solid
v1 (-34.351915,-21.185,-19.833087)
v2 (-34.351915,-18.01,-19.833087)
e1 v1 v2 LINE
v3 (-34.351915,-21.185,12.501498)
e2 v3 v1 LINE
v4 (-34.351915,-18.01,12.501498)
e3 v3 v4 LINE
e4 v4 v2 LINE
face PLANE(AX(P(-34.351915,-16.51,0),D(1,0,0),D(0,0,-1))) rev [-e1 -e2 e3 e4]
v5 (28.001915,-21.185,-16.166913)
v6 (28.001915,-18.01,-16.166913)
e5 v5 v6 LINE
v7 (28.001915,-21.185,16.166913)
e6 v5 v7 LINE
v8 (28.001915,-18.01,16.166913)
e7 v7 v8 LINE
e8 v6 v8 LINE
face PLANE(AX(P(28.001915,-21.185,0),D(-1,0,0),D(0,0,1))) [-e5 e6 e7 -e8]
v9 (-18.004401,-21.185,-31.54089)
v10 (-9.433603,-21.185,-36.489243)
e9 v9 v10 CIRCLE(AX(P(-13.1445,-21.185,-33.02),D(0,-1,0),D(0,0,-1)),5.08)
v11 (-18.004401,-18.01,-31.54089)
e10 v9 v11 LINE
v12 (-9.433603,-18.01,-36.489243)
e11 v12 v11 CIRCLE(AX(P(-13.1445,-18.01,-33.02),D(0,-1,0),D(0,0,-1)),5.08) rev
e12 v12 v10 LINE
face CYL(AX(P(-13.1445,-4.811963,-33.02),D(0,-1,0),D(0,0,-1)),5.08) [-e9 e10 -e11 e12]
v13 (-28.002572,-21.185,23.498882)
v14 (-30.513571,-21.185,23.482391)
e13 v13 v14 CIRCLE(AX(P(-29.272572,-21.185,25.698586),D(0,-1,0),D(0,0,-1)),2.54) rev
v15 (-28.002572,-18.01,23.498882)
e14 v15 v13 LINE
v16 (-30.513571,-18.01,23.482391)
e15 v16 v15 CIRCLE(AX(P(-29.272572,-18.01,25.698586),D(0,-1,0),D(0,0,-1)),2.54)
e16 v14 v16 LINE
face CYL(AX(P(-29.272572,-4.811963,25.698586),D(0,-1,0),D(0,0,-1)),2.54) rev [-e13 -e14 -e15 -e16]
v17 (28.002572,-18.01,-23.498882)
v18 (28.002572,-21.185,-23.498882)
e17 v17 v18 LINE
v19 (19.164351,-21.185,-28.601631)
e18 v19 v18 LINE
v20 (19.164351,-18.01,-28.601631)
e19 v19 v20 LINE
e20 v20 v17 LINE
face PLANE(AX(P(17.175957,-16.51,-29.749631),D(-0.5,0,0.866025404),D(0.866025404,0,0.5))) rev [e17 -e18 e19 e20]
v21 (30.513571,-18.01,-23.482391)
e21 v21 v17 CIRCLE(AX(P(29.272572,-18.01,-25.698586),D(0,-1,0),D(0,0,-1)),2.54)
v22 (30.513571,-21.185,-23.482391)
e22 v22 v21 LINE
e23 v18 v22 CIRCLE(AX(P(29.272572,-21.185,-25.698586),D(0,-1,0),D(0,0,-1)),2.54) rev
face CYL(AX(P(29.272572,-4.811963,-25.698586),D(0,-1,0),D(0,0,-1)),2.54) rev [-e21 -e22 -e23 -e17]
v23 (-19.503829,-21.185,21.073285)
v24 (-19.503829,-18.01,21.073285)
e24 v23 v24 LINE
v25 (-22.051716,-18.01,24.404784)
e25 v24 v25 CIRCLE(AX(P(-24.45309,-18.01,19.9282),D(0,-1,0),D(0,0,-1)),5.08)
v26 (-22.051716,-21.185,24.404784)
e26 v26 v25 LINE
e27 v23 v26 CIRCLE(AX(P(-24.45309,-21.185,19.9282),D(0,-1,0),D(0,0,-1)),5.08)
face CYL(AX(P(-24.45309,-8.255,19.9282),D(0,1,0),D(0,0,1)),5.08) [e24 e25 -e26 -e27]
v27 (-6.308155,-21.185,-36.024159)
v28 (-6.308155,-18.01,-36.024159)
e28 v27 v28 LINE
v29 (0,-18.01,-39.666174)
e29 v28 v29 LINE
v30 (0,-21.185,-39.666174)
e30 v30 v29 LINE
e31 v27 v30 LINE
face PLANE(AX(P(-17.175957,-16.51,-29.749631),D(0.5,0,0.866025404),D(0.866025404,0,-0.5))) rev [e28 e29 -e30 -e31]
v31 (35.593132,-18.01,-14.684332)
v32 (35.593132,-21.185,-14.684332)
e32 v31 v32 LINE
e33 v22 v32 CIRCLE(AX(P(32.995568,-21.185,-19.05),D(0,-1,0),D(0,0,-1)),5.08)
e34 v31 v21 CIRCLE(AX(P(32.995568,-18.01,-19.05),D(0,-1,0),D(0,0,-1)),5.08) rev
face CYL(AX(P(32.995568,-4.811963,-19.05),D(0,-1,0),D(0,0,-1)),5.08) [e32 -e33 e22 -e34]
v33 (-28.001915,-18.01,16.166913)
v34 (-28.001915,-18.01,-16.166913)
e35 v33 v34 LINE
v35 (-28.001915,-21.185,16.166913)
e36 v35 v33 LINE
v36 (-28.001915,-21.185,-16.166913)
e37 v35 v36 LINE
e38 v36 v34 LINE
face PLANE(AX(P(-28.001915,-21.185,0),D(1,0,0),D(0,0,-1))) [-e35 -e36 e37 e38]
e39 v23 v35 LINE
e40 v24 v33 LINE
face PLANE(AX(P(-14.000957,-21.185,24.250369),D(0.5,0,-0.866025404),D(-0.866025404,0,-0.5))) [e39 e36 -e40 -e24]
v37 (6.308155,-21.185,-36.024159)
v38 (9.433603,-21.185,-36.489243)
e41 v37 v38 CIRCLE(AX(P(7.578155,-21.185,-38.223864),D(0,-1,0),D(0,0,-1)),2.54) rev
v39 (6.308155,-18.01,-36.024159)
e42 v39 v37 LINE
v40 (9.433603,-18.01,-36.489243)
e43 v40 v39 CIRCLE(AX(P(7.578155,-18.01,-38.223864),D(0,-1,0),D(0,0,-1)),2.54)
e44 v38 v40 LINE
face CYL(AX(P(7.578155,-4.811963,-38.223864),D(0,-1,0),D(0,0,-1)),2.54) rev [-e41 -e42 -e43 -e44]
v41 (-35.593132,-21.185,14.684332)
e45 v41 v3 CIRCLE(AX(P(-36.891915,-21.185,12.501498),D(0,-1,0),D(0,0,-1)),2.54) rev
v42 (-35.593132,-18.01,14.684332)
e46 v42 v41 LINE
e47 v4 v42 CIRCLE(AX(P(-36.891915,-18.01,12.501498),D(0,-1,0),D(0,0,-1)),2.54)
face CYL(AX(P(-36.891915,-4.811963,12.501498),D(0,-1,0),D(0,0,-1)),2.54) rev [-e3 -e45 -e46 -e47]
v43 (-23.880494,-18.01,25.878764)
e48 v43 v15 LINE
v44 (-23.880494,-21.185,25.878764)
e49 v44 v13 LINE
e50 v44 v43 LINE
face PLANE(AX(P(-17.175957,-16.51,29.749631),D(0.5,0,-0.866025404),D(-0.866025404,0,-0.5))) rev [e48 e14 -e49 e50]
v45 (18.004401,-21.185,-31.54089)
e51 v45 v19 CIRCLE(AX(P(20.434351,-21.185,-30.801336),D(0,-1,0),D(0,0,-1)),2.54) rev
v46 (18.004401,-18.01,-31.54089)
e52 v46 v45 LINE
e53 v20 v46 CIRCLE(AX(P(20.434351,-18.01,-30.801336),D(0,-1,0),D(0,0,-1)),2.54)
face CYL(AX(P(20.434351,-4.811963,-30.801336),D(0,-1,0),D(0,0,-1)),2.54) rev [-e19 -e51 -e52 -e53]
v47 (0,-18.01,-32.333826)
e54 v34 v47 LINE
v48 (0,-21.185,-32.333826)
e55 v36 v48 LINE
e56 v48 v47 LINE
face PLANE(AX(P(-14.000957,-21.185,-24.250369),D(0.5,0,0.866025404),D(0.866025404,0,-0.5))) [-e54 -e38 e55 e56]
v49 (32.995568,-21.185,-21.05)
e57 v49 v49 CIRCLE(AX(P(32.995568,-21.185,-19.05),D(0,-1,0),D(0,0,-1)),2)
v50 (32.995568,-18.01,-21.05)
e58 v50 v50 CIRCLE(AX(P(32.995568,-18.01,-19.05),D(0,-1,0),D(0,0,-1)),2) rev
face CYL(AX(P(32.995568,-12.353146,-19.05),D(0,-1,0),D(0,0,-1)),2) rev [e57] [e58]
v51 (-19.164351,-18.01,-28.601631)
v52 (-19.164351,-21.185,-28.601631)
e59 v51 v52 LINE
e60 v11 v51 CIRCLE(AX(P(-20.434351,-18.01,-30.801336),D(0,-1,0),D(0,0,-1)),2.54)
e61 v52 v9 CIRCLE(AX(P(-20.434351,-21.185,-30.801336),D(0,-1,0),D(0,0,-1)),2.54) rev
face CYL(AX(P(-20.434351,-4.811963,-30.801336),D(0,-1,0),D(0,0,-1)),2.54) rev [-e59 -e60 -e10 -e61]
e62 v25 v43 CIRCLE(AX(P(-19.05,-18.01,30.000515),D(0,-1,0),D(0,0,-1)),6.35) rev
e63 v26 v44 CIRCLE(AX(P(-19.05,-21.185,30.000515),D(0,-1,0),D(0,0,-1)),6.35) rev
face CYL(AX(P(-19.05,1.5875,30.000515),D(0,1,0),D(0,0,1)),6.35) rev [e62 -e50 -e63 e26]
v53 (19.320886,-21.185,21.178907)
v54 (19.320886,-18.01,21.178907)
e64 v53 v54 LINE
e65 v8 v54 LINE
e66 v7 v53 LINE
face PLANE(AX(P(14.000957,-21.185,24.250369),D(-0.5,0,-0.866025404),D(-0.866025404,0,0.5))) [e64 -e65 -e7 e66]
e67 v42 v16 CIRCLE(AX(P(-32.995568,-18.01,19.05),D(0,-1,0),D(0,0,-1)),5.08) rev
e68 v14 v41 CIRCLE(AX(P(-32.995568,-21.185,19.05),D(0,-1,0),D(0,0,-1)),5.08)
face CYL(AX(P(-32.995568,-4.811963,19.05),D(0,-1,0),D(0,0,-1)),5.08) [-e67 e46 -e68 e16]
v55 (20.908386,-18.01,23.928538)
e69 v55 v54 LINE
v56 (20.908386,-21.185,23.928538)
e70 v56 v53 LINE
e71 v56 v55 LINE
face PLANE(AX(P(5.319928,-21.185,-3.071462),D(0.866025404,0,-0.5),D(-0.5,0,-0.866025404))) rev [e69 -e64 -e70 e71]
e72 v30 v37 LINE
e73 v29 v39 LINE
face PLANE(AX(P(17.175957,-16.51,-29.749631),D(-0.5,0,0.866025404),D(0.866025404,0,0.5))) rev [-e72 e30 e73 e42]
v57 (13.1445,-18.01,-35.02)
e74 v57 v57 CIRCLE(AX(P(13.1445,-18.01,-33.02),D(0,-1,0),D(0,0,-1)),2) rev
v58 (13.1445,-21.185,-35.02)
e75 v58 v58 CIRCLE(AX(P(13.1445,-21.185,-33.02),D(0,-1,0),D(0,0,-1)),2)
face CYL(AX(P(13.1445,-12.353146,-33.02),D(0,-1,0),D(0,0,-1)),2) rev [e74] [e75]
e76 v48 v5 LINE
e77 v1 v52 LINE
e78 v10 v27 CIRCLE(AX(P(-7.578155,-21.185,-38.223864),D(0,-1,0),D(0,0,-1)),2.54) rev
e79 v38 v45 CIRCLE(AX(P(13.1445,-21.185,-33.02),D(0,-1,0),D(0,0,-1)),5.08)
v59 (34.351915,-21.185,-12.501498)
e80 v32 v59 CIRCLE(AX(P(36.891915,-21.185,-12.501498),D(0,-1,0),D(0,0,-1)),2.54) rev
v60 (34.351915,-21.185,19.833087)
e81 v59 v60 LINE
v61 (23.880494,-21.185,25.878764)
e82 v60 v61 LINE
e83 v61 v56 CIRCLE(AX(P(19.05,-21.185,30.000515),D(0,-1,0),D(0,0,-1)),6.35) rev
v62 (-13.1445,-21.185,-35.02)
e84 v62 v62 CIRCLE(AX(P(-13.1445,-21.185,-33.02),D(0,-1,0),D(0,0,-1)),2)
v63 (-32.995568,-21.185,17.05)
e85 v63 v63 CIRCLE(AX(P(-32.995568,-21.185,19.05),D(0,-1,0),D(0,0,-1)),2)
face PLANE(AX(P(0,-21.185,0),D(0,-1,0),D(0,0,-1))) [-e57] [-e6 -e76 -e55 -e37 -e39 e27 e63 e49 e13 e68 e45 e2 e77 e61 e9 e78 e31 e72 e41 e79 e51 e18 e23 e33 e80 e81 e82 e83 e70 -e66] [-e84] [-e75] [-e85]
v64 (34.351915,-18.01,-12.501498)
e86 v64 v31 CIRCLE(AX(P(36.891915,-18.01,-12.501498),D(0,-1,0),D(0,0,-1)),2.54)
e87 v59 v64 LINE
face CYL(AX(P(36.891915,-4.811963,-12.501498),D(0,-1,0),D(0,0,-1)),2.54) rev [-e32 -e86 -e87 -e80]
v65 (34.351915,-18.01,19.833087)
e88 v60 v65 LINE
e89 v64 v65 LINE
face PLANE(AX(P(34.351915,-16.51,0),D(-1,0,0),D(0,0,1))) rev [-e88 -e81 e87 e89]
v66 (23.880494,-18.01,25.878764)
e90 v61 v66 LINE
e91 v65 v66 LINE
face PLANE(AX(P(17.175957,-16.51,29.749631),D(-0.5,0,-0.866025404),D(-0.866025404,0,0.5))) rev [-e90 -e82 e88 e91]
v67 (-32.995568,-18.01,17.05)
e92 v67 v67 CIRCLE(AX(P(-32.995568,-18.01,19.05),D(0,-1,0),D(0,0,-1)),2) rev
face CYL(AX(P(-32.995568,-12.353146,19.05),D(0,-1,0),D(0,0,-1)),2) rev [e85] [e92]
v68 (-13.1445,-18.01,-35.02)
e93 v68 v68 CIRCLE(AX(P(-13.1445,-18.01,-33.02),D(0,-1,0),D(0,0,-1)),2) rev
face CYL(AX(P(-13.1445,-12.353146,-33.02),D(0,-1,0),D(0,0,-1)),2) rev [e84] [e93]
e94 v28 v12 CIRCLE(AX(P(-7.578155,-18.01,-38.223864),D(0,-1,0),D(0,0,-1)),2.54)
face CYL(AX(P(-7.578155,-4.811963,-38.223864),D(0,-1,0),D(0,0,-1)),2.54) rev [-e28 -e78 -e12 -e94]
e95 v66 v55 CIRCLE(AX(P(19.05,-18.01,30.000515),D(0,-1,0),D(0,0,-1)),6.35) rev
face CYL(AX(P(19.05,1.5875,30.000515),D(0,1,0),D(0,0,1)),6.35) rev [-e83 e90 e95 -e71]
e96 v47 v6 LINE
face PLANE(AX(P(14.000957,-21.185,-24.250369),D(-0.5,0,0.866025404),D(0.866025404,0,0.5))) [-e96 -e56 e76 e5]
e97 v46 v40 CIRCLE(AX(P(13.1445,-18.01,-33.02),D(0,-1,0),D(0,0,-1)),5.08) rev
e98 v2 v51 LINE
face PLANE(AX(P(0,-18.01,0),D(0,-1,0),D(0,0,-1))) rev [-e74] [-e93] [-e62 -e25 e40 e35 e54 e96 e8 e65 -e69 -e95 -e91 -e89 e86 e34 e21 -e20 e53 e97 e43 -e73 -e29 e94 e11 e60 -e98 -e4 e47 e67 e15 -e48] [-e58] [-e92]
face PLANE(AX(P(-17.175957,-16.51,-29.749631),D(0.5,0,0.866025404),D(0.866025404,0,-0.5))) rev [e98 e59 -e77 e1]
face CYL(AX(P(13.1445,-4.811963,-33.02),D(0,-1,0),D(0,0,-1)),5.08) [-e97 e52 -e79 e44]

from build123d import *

# Parameters (mm, degrees)
SKETCH1_R            = 50.8
SKETCH1_R_2          = 48.8
SKETCH1_R_3          = 1.905
BOSS_EXTRUDE1_DEPTH  = 3.175
SKETCH3_R            = 50.8
SKETCH3_R_2          = 48.8
BOSS_EXTRUDE3_DEPTH  = 17.78
CUT_EXTRUDE1_DEPTH   = 75.009515604
FILLET2_R            = 6.35
SKETCH5_R            = 1.905
SKETCH5_W            = 16.479
SKETCH5_H            = 6
BOSS_EXTRUDE4_DEPTH  = 1
CUT_EXTRUDE2_DEPTH   = 75.835767181
BOSS_EXTRUDE5_DEPTH  = 17.78
SKETCH10_R           = 1.5
CUT_EXTRUDE4_DEPTH   = 75.009515742
BOSS_EXTRUDE7_START  = 17.78
SKETCH11_R           = 4.04
SKETCH11_R_2         = 1.5
BOSS_EXTRUDE7_DEPTH  = 17.78
BOSS_EXTRUDE8_START  = 31.75
BOSS_EXTRUDE8_DEPTH  = 31.75
FILLET4_R            = 3.175
BOSS_EXTRUDE9_DEPTH  = 15.24
CUT_EXTRUDE5_REACH   = 128.859
CIRPATTERN1_COUNT    = 4
BOSS_EXTRUDE12_DEPTH = 16.51
FILLET8_START        = -18
FILLET8_DEPTH        = 18
FILLET8_START_2      = -16.51
FILLET8_2_DEPTH      = 16.51
BOSS_EXTRUDE13_DEPTH = 1.5
FILLET9_R            = 5.08
BOSS_EXTRUDE14_START = -18.01
BOSS_EXTRUDE14_DEPTH = 18.01
SKETCH21_R           = 1.5
SKETCH21_R_2         = 1.905
BOSS_EXTRUDE15_DEPTH = 3.175
SKETCH22_R           = 73.302422264
CUT_EXTRUDE6_DEPTH   = 38.965
SKETCH24_R           = 2
CUT_EXTRUDE7_DEPTH   = 3.175
BOSS_EXTRUDE16_DEPTH = 3.175
FILLET10_R           = 2.54


with BuildPart() as part:
    # Sketch1 → Boss-Extrude1 (new body)
    # profile 1 of 2: a face of its own
    with BuildSketch(Plane(origin=(0, 0, 0), x_dir=(1, 0, 0), z_dir=(0, 1, 0))):
        with Locations(Location((0, 0, 0), (0, 0, 270))):
            Circle(SKETCH1_R)
        Circle(SKETCH1_R_2, mode=Mode.SUBTRACT)
    # profile 2 of 2: a face of its own
    with BuildSketch(Plane(origin=(0, 0, 0), x_dir=(1, 0, 0), z_dir=(0, 1, 0))):
        Circle(SKETCH1_R_2)
        with Locations(Location((-13.1445, 33.02, 0), (0, 0, 270))):
            Circle(SKETCH1_R_3, mode=Mode.SUBTRACT)
        with Locations(Location((13.1445, 33.02, 0), (0, 0, 270))):
            Circle(SKETCH1_R_3, mode=Mode.SUBTRACT)
    extrude(amount=BOSS_EXTRUDE1_DEPTH)

    # Sketch3 → Boss-Extrude3 (add)
    with BuildSketch(Plane(origin=(0, 3.175, 0), x_dir=(1, 0, 0), z_dir=(0, 1, 0))):
        with Locations(Location((0, 0, 0), (0, 0, 270))):
            Circle(SKETCH3_R)
        with Locations(Location((0, 0, 0), (0, 0, 270))):
            Circle(SKETCH3_R_2, mode=Mode.SUBTRACT)
    extrude(amount=BOSS_EXTRUDE3_DEPTH)

    # Sketch4 → Cut-Extrude1 (cut, through all)
    with BuildSketch(Plane(origin=(0, 3.175, 0), x_dir=(1, 0, 0), z_dir=(0, 1, 0))):
        with BuildLine():
            Line((25.4, -38.01523905), (25.4, -20.834346642))
            add(Edge.make_bspline(
                [(-25.4, -20.834346642), (0, -32.254229315), (25.4, -20.834346642)],
                knots=[0, 0, 0, 1, 1, 1], degree=2))
            Line((-25.4, -20.834346642), (-25.4, -38.01523905))
            ThreePointArc((-25.4, -38.01523905), (0, -45.72), (25.4, -38.01523905))
        make_face()
    extrude(amount=-CUT_EXTRUDE1_DEPTH, mode=Mode.SUBTRACT)

    # Fillet2
    fillet2_edges = [part.edges().sort_by_distance(p)[0] for p in [
        (25.4, 1.5875, 20.834346642),
        (-25.4, 1.5875, 20.834346642),
        (-25.4, 1.5875, 38.01523905),
        (25.4, 1.5875, 38.01523905),
    ]]
    fillet(fillet2_edges, radius=FILLET2_R)

    # Sketch5 → Boss-Extrude4 (add)
    # profile 1 of 8: a face of its own
    with BuildSketch(Plane(origin=(0, 3.175, 0), x_dir=(1, 0, 0), z_dir=(0, 1, 0))):
        with BuildLine():
            Line((13.1445, 37.925), (-13.1445, 37.925))
            ThreePointArc((-13.1445, 37.925), (-9.676141238, 36.488358762), (-8.2395, 33.02))
            Line((-8.2395, 33.02), (-8.2395, 28.115))
            Line((-8.2395, 28.115), (8.2395, 28.115))
            Line((8.2395, 28.115), (8.2395, 33.02))
            ThreePointArc((8.2395, 33.02), (9.676141238, 36.488358762), (13.1445, 37.925))
        make_face()
    # profile 2 of 8: a face of its own
    with BuildSketch(Plane(origin=(0, 3.175, 0), x_dir=(1, 0, 0), z_dir=(0, 1, 0))):
        with BuildLine():
            ThreePointArc((-8.2395, 33.02), (-9.676141238, 36.488358762), (-13.1445, 37.925))
            ThreePointArc((-13.1445, 37.925), (-16.612858762, 36.488358762), (-18.0495, 33.02))
            ThreePointArc((-18.0495, 33.02), (-16.612858762, 29.551641238), (-13.1445, 28.115))
            ThreePointArc((-13.1445, 28.115), (-9.676141238, 29.551641238), (-8.2395, 33.02))
        make_face()
        with Locations(Location((-13.1445, 33.02, 0), (0, 0, 270))):
            Circle(SKETCH5_R, mode=Mode.SUBTRACT)
    # profile 3 of 8: a face of its own
    with BuildSketch(Plane(origin=(0, 3.175, 0), x_dir=(1, 0, 0), z_dir=(0, 1, 0))):
        with BuildLine():
            ThreePointArc((18.0495, 33.02), (16.612858762, 36.488358762), (13.1445, 37.925))
            ThreePointArc((13.1445, 37.925), (9.676141238, 36.488358762), (8.2395, 33.02))
            ThreePointArc((8.2395, 33.02), (9.676141238, 29.551641238), (13.1445, 28.115))
            ThreePointArc((13.1445, 28.115), (16.612858762, 29.551641238), (18.0495, 33.02))
        make_face()
        with Locations(Location((13.1445, 33.02, 0), (0, 0, 270))):
            Circle(SKETCH5_R, mode=Mode.SUBTRACT)
    # profile 4 of 8: a face of its own
    with BuildSketch(Plane(origin=(0, 3.175, 0), x_dir=(1, 0, 0), z_dir=(0, 1, 0))):
        with BuildLine():
            Line((-8.2395, 28.115), (-8.2395, 33.02))
            ThreePointArc((-8.2395, 33.02), (-9.676141238, 29.551641238), (-13.1445, 28.115))
            Line((-13.1445, 28.115), (-8.2395, 28.115))
        make_face()
    # profile 5 of 8: a face of its own
    with BuildSketch(Plane(origin=(0, 3.175, 0), x_dir=(1, 0, 0), z_dir=(0, 1, 0))):
        with BuildLine():
            ThreePointArc((-13.1445, 28.115), (-16.612858762, 29.551641238), (-18.0495, 33.02))
            Line((-18.0495, 33.02), (-18.0495, -23.729829016))
            add(Edge.make_bspline(
                [(-17.200482213, -23.925830908), (-17.339134534, -23.883616376), (-17.479112922, -23.845147844), (-17.620279441, -23.81048615), (-17.762494237, -23.779683986), (-17.905615595, -23.752786017), (-18.049499996, -23.729828993)],
                knots=[0, 0, 0, 0, 0, 0, 0, 0.074218898, 0.074218898, 0.074218898, 0.074218898, 0.074218898, 0.074218898, 0.074218898], degree=6))
            add(Edge.make_bspline(
                [(-17.200482213, -23.925830908), (-12.719991107, -25.289975642), (-8.2395, -25.943438167)],
                knots=[0.16140783, 0.16140783, 0.16140783, 0.337805118, 0.337805118, 0.337805118], degree=2))
            Line((-8.2395, -25.943438167), (-8.2395, -2.461719083))
            Line((-8.2395, -2.461719083), (-8.2395, 3.538280917))
            Line((-8.2395, 3.538280917), (-8.2395, 28.115))
            Line((-8.2395, 28.115), (-13.1445, 28.115))
        make_face()
    # profile 6 of 8: a face of its own
    with BuildSketch(Plane(origin=(0, 3.175, 0), x_dir=(1, 0, 0), z_dir=(0, 1, 0))):
        with BuildLine():
            Line((18.0495, -23.729829016), (18.0495, 33.02))
            ThreePointArc((18.0495, 33.02), (16.612858762, 29.551641238), (13.1445, 28.115))
            Line((13.1445, 28.115), (8.2395, 28.115))
            Line((8.2395, 28.115), (8.2395, 3.538280917))
            Line((8.2395, 3.538280917), (8.2395, -2.461719083))
            Line((8.2395, -2.461719083), (8.2395, -25.943438167))
            add(Edge.make_bspline(
                [(8.2395, -25.943438167), (12.719991107, -25.289975642), (17.200482213, -23.925830908)],
                knots=[0.662194882, 0.662194882, 0.662194882, 0.83859217, 0.83859217, 0.83859217], degree=2))
            add(Edge.make_bspline(
                [(18.049499996, -23.729828993), (17.905615595, -23.752786017), (17.762494237, -23.779683986), (17.620279441, -23.81048615), (17.479112922, -23.845147844), (17.339134534, -23.883616376), (17.200482213, -23.925830908)],
                knots=[0.925781102, 0.925781102, 0.925781102, 0.925781102, 0.925781102, 0.925781102, 0.925781102, 1, 1, 1, 1, 1, 1, 1], degree=6))
        make_face()
    # profile 7 of 8: a face of its own
    with BuildSketch(Plane(origin=(0, 3.175, 0), x_dir=(1, 0, 0), z_dir=(0, 1, 0))):
        with BuildLine():
            ThreePointArc((13.1445, 28.115), (9.676141238, 29.551641238), (8.2395, 33.02))
            Line((8.2395, 33.02), (8.2395, 28.115))
            Line((8.2395, 28.115), (13.1445, 28.115))
        make_face()
    # profile 8 of 8: a face of its own
    with BuildSketch(Plane(origin=(0, 3.175, 0), x_dir=(1, 0, 0), z_dir=(0, 1, 0))):
        with Locations((0, 0.538280917)):
            Rectangle(SKETCH5_W, SKETCH5_H)
    extrude(amount=BOSS_EXTRUDE4_DEPTH)

    # Sketch6 → Cut-Extrude2 (cut, through all)
    with BuildSketch(Plane(origin=(0, 20.955, 0), x_dir=(1, 0, 0), z_dir=(0, 1, 0))):
        with BuildLine():
            Line((42.262039705, 24.4), (39.594681461, 22.86))
            ThreePointArc((39.594681461, 22.86), (44.162128778, 11.833206742), (45.72, 0))
            Line((45.72, 0), (48.8, 0))
            ThreePointArc((48.8, 0), (47.137180323, 12.630369401), (42.262039705, 24.4))
        make_face()
        with BuildLine():
            ThreePointArc((45.72, 0), (44.162128778, -11.833206742), (39.594681461, -22.86))
            Line((39.594681461, -22.86), (42.262039705, -24.4))
            ThreePointArc((42.262039705, -24.4), (47.137180323, -12.630369401), (48.8, 0))
            Line((48.8, 0), (45.72, 0))
        make_face()
        with BuildLine():
            ThreePointArc((48.8, 0), (47.137180323, -12.630369401), (42.262039705, -24.4))
            Line((42.262039705, -24.4), (43.994090512, -25.4))
            ThreePointArc((43.994090512, -25.4), (49.069031975, -13.148007491), (50.8, 0))
            Line((50.8, 0), (48.8, 0))
        make_face()
        with BuildLine():
            Line((43.994090512, 25.4), (42.262039705, 24.4))
            ThreePointArc((42.262039705, 24.4), (47.137180323, 12.630369401), (48.8, 0))
            Line((48.8, 0), (50.8, 0))
            ThreePointArc((50.8, 0), (49.069031975, 13.148007491), (43.994090512, 25.4))
        make_face()
    extrude(amount=-CUT_EXTRUDE2_DEPTH, mode=Mode.SUBTRACT)

    # Sketch7 → Boss-Extrude5 (add)
    with BuildSketch(Plane(origin=(0, 3.175, 0), x_dir=(1, 0, 0), z_dir=(0, 1, 0))):
        with BuildLine():
            Line((42.262039705, -24.4), (39.594681461, -22.86))
            ThreePointArc((39.594681461, -22.86), (45.72, 0), (39.594681461, 22.86))
            Line((39.594681461, 22.86), (42.262039705, 24.4))
            ThreePointArc((42.262039705, 24.4), (41.753056776, 25.261081723), (41.226531944, 26.111550392))
            Line((41.226531944, 26.111550392), (36.822993007, 23.569166002))
            ThreePointArc((36.822993007, 23.569166002), (43.72, 0), (36.822993007, -23.569166002))
            Line((36.822993007, -23.569166002), (41.226531944, -26.111550392))
            ThreePointArc((41.226531944, -26.111550392), (41.753056776, -25.261081723), (42.262039705, -24.4))
        make_face()
    extrude(amount=BOSS_EXTRUDE5_DEPTH)

    # Sketch10 → Cut-Extrude4 (cut, through all)
    with BuildSketch(Plane(origin=(0, 3.175, 0), x_dir=(1, 0, 0), z_dir=(0, 1, 0))):
        with Locations(Location((-32.995567884, -19.05, 0), (0, 0, 270))):
            Circle(SKETCH10_R)
        with Locations(Location((32.995567884, 19.05, 0), (0, 0, 270))):
            Circle(SKETCH10_R)
    extrude(amount=-CUT_EXTRUDE4_DEPTH, mode=Mode.SUBTRACT)

    # Sketch11 → Boss-Extrude7 (add)
    # profile 1 of 3: a face of its own
    with BuildSketch(Plane(origin=(0, 3.175, 0), x_dir=(1, 0, 0), z_dir=(0, 1, 0)).offset(BOSS_EXTRUDE7_START)):
        with BuildLine():
            Line((37.125332322, 23.09), (32.995567884, 23.09))
            ThreePointArc((32.995567884, 23.09), (35.85227928, 21.906711396), (37.035567884, 19.05))
            ThreePointArc((37.035567884, 19.05), (35.85227928, 16.193288604), (32.995567884, 15.01))
            Line((32.995567884, 15.01), (41.062614383, 15.01))
            ThreePointArc((41.062614383, 15.01), (39.302167275, 19.151450272), (37.125332322, 23.09))
        make_face()
    # profile 2 of 3: a face of its own
    with BuildSketch(Plane(origin=(0, 3.175, 0), x_dir=(1, 0, 0), z_dir=(0, 1, 0)).offset(BOSS_EXTRUDE7_START)):
        with Locations((32.995567884, 19.05)):
            Circle(SKETCH11_R)
        with Locations(Location((32.995567884, 19.05, 0), (0, 0, 270))):
            Circle(SKETCH11_R_2, mode=Mode.SUBTRACT)
    # profile 3 of 3: a face of its own
    with BuildSketch(Plane(origin=(0, 3.175, 0), x_dir=(1, 0, 0), z_dir=(0, 1, 0)).offset(BOSS_EXTRUDE7_START)):
        with Locations(Location((-32.995567884, -19.05, 0), (0, 0, 270))):
            Circle(SKETCH11_R)
        with Locations(Location((-32.995567884, -19.05, 0), (0, 0, 270))):
            Circle(SKETCH11_R_2, mode=Mode.SUBTRACT)
    extrude(amount=-BOSS_EXTRUDE7_DEPTH)

    # Sketch12 → Boss-Extrude8 (add)
    with BuildSketch(Plane.XZ.offset(BOSS_EXTRUDE8_START)):
        with BuildLine():
            ThreePointArc((28.584071469, 41.995128982), (29.185832393, 29.185832393), (41.995128982, 28.584071469))
            ThreePointArc((41.995128982, 28.584071469), (35.921024484, 35.921024484), (28.584071469, 41.995128982))
        make_face()
        with BuildLine():
            ThreePointArc((28.584071469, -41.995128982), (35.921024484, -35.921024484), (41.995128982, -28.584071469))
            ThreePointArc((41.995128982, -28.584071469), (29.185832393, -29.185832393), (28.584071469, -41.995128982))
        make_face()
        with BuildLine():
            ThreePointArc((-41.995128982, 28.584071469), (-29.185832393, 29.185832393), (-28.584071469, 41.995128982))
            ThreePointArc((-28.584071469, 41.995128982), (-35.921024484, 35.921024484), (-41.995128982, 28.584071469))
        make_face()
        with BuildLine():
            ThreePointArc((-41.995128982, -28.584071469), (-35.921024484, -35.921024484), (-28.584071469, -41.995128982))
            ThreePointArc((-28.584071469, -41.995128982), (-29.185832393, -29.185832393), (-41.995128982, -28.584071469))
        make_face()
    extrude(amount=-BOSS_EXTRUDE8_DEPTH)

    # Fillet4
    fillet4_edges = [part.edges().sort_by_distance(p)[0] for p in [
        (41.995128982, -15.875, 28.584071469),
        (28.584071469, -15.875, 41.995128982),
        (28.584071469, -15.875, -41.995128982),
        (41.995128982, -15.875, -28.584071469),
        (-28.584071469, -15.875, 41.995128982),
        (-41.995128982, -15.875, 28.584071469),
        (-41.995128982, -15.875, -28.584071469),
        (-28.584071469, -15.875, -41.995128982),
    ]]
    fillet(fillet4_edges, radius=FILLET4_R)

    # Sketch13 → Boss-Extrude9 (add)
    with BuildSketch(Plane.XZ.offset(31.75)):
        Polygon((35.022998872, 35.022998872), (30.532870812, 39.513126933), (26.940768363, 35.921024484), (35.921024484, 26.940768363), (39.513126933, 30.532870812), align=None)
        Polygon((26.940763662, -35.921029185), (35.921019783, -26.940773064), (39.513122232, -30.532875513), (35.022994171, -35.023003573), (30.532866111, -39.513131634), align=None)
        Polygon((-35.921033886, -26.940768363), (-26.940777765, -35.921024484), (-30.532880214, -39.513126933), (-35.023008274, -35.022998872), (-39.513136335, -30.532870812), align=None)
        Polygon((-26.940773064, 35.921029185), (-35.921029185, 26.940773064), (-39.513131634, 30.532875513), (-35.023003573, 35.023003573), (-30.532875513, 39.513131634), align=None)
    extrude(amount=BOSS_EXTRUDE9_DEPTH)

    # Sketch15 → Cut-Extrude5 (cut, up to next)
    with BuildSketch(Plane(origin=(-35.023003573, 0, 35.023003573), x_dir=(0.7071067811865472, 0, 0.7071067811865479), z_dir=(-0.7071067811865479, 0, 0.7071067811865472)), mode=Mode.PRIVATE) as cut_extrude5_sk1:
        with BuildLine():
            ThreePointArc((-1.280368799, -37.833557441), (-1.536442559, -40.650368799), (1.280368799, -40.906442559))
            Line((1.280368799, -40.906442559), (-1.280368799, -37.833557441))
        make_face()
    cut_extrude5_tool1 = extrude(cut_extrude5_sk1.sketch, amount=-CUT_EXTRUDE5_REACH, mode=Mode.PRIVATE) & part.part
    # Sketch15 → Cut-Extrude5 (cut, up to next)
    with BuildSketch(Plane(origin=(-35.023003573, 0, 35.023003573), x_dir=(0.7071067811865472, 0, 0.7071067811865479), z_dir=(-0.7071067811865479, 0, 0.7071067811865472)), mode=Mode.PRIVATE) as cut_extrude5_sk2:
        with BuildLine():
            Line((-1.280368799, -37.833557441), (1.280368799, -40.906442559))
            ThreePointArc((1.280368799, -40.906442559), (1.811178842, -40.218310792), (2, -39.37))
            ThreePointArc((2, -39.37), (0.848310792, -37.558821158), (-1.280368799, -37.833557441))
        make_face()
    cut_extrude5_tool2 = extrude(cut_extrude5_sk2.sketch, amount=-CUT_EXTRUDE5_REACH, mode=Mode.PRIVATE) & part.part
    # Sketch15 → Cut-Extrude5 (cut, up to next)
    with BuildSketch(Plane(origin=(-35.023003573, 0, 35.023003573), x_dir=(0.7071067811865472, 0, 0.7071067811865479), z_dir=(-0.7071067811865479, 0, 0.7071067811865472)), mode=Mode.PRIVATE) as cut_extrude5_sk3:
        with BuildLine():
            ThreePointArc((-1.280368799, -37.833557441), (-1.536442559, -40.650368799), (1.280368799, -40.906442559))
            Line((1.280368799, -40.906442559), (-1.280368799, -37.833557441))
        make_face()
    cut_extrude5_tool3 = extrude(cut_extrude5_sk3.sketch, amount=-CUT_EXTRUDE5_REACH, mode=Mode.PRIVATE) & part.part
    # Sketch15 → Cut-Extrude5 (cut, up to next)
    with BuildSketch(Plane(origin=(-35.023003573, 0, 35.023003573), x_dir=(0.7071067811865472, 0, 0.7071067811865479), z_dir=(-0.7071067811865479, 0, 0.7071067811865472)), mode=Mode.PRIVATE) as cut_extrude5_sk4:
        with BuildLine():
            Line((-1.280368799, -37.833557441), (1.280368799, -40.906442559))
            ThreePointArc((1.280368799, -40.906442559), (1.811178842, -40.218310792), (2, -39.37))
            ThreePointArc((2, -39.37), (0.848310792, -37.558821158), (-1.280368799, -37.833557441))
        make_face()
    cut_extrude5_tool4 = extrude(cut_extrude5_sk4.sketch, amount=-CUT_EXTRUDE5_REACH, mode=Mode.PRIVATE) & part.part
    cut_extrude5_1 = cut_extrude5_tool1.solids().sort_by_distance((-35.484098, -39.913405, 34.561909))[0]
    add(cut_extrude5_1, mode=Mode.SUBTRACT)
    cut_extrude5_2 = cut_extrude5_tool2.solids().sort_by_distance((-34.561909, -38.826595, 35.484098))[0]
    add(cut_extrude5_2, mode=Mode.SUBTRACT)
    cut_extrude5_3 = cut_extrude5_tool3.solids().sort_by_distance((-35.484098, -39.913405, 34.561909))[0]
    add(cut_extrude5_3, mode=Mode.SUBTRACT)
    cut_extrude5_4 = cut_extrude5_tool4.solids().sort_by_distance((-34.561909, -38.826595, 35.484098))[0]
    add(cut_extrude5_4, mode=Mode.SUBTRACT)
    cut_extrude5 = cut_extrude5_1 + cut_extrude5_2 + cut_extrude5_3 + cut_extrude5_4  # Cut-Extrude5 as one shape, for the pattern or mirror that repeats it

    # CirPattern1: Cut-Extrude5; each copy of Cut-Extrude5 runs up to whatever stops it at its own place
    cirpattern1_before = part.part  # the part as the pattern finds it: every copy runs up to it
    cirpattern1_cut_extrude5_long1 = extrude(cut_extrude5_sk1.sketch, amount=-CUT_EXTRUDE5_REACH, mode=Mode.PRIVATE)
    cirpattern1_cut_extrude5_long2 = extrude(cut_extrude5_sk2.sketch, amount=-CUT_EXTRUDE5_REACH, mode=Mode.PRIVATE)
    cirpattern1_cut_extrude5_long3 = extrude(cut_extrude5_sk3.sketch, amount=-CUT_EXTRUDE5_REACH, mode=Mode.PRIVATE)
    cirpattern1_cut_extrude5_long4 = extrude(cut_extrude5_sk4.sketch, amount=-CUT_EXTRUDE5_REACH, mode=Mode.PRIVATE)
    cirpattern1_cut_extrude5_tool1_1 = cirpattern1_cut_extrude5_long1.rotate(Axis((0, 3.175, 0), (0, -1, 0)), 1 * 360 / CIRPATTERN1_COUNT) & cirpattern1_before
    add(cirpattern1_cut_extrude5_tool1_1.solids().sort_by_distance((-34.561909, -39.913405, -35.484098))[0], mode=Mode.SUBTRACT)
    cirpattern1_cut_extrude5_tool2_1 = cirpattern1_cut_extrude5_long2.rotate(Axis((0, 3.175, 0), (0, -1, 0)), 1 * 360 / CIRPATTERN1_COUNT) & cirpattern1_before
    add(cirpattern1_cut_extrude5_tool2_1.solids().sort_by_distance((-35.484098, -38.826595, -34.561909))[0], mode=Mode.SUBTRACT)
    cirpattern1_cut_extrude5_tool3_1 = cirpattern1_cut_extrude5_long3.rotate(Axis((0, 3.175, 0), (0, -1, 0)), 1 * 360 / CIRPATTERN1_COUNT) & cirpattern1_before
    add(cirpattern1_cut_extrude5_tool3_1.solids().sort_by_distance((-34.561909, -39.913405, -35.484098))[0], mode=Mode.SUBTRACT)
    cirpattern1_cut_extrude5_tool4_1 = cirpattern1_cut_extrude5_long4.rotate(Axis((0, 3.175, 0), (0, -1, 0)), 1 * 360 / CIRPATTERN1_COUNT) & cirpattern1_before
    add(cirpattern1_cut_extrude5_tool4_1.solids().sort_by_distance((-35.484098, -38.826595, -34.561909))[0], mode=Mode.SUBTRACT)
    cirpattern1_cut_extrude5_tool1_2 = cirpattern1_cut_extrude5_long1.rotate(Axis((0, 3.175, 0), (0, -1, 0)), 2 * 360 / CIRPATTERN1_COUNT) & cirpattern1_before
    add(cirpattern1_cut_extrude5_tool1_2.solids().sort_by_distance((35.484098, -39.913405, -34.561909))[0], mode=Mode.SUBTRACT)
    cirpattern1_cut_extrude5_tool2_2 = cirpattern1_cut_extrude5_long2.rotate(Axis((0, 3.175, 0), (0, -1, 0)), 2 * 360 / CIRPATTERN1_COUNT) & cirpattern1_before
    add(cirpattern1_cut_extrude5_tool2_2.solids().sort_by_distance((34.561909, -38.826595, -35.484098))[0], mode=Mode.SUBTRACT)
    cirpattern1_cut_extrude5_tool3_2 = cirpattern1_cut_extrude5_long3.rotate(Axis((0, 3.175, 0), (0, -1, 0)), 2 * 360 / CIRPATTERN1_COUNT) & cirpattern1_before
    add(cirpattern1_cut_extrude5_tool3_2.solids().sort_by_distance((35.484098, -39.913405, -34.561909))[0], mode=Mode.SUBTRACT)
    cirpattern1_cut_extrude5_tool4_2 = cirpattern1_cut_extrude5_long4.rotate(Axis((0, 3.175, 0), (0, -1, 0)), 2 * 360 / CIRPATTERN1_COUNT) & cirpattern1_before
    add(cirpattern1_cut_extrude5_tool4_2.solids().sort_by_distance((34.561909, -38.826595, -35.484098))[0], mode=Mode.SUBTRACT)
    cirpattern1_cut_extrude5_tool1_3 = cirpattern1_cut_extrude5_long1.rotate(Axis((0, 3.175, 0), (0, -1, 0)), 3 * 360 / CIRPATTERN1_COUNT) & cirpattern1_before
    add(cirpattern1_cut_extrude5_tool1_3.solids().sort_by_distance((34.561909, -39.913405, 35.484098))[0], mode=Mode.SUBTRACT)
    cirpattern1_cut_extrude5_tool2_3 = cirpattern1_cut_extrude5_long2.rotate(Axis((0, 3.175, 0), (0, -1, 0)), 3 * 360 / CIRPATTERN1_COUNT) & cirpattern1_before
    add(cirpattern1_cut_extrude5_tool2_3.solids().sort_by_distance((35.484098, -38.826595, 34.561909))[0], mode=Mode.SUBTRACT)
    cirpattern1_cut_extrude5_tool3_3 = cirpattern1_cut_extrude5_long3.rotate(Axis((0, 3.175, 0), (0, -1, 0)), 3 * 360 / CIRPATTERN1_COUNT) & cirpattern1_before
    add(cirpattern1_cut_extrude5_tool3_3.solids().sort_by_distance((34.561909, -39.913405, 35.484098))[0], mode=Mode.SUBTRACT)
    cirpattern1_cut_extrude5_tool4_3 = cirpattern1_cut_extrude5_long4.rotate(Axis((0, 3.175, 0), (0, -1, 0)), 3 * 360 / CIRPATTERN1_COUNT) & cirpattern1_before
    add(cirpattern1_cut_extrude5_tool4_3.solids().sort_by_distance((35.484098, -38.826595, 34.561909))[0], mode=Mode.SUBTRACT)

    # Sketch17 → Boss-Extrude12 (add)
    with BuildSketch(Plane.XZ):
        with BuildLine():
            add(Edge.make_bspline(
                [(-20.908385644, 23.92853792), (-21.252685586, 24.033914158), (-21.590074219, 24.162797085), (-21.918441414, 24.314613049), (-22.235799029, 24.488530911), (-22.540264994, 24.683499874), (-23.022979339, 25.041122982), (-23.209393805, 25.192784203), (-23.388812385, 25.35281665), (-23.560757013, 25.520801391), (-23.724786032, 25.69628198), (-23.880494201, 25.878764454)],
                knots=[0.318286262, 0.318286262, 0.318286262, 0.318286262, 0.318286262, 0.318286262, 0.318286262, 0.49999907, 0.49999907, 0.49999907, 0.49999907, 0.49999907, 0.620942534, 0.620942534, 0.620942534, 0.620942534, 0.620942534, 0.620942534, 0.620942534], degree=6))
            Line((-23.880494201, 25.878764454), (-33.118995485, 20.544913251))
            ThreePointArc((-33.118995485, 20.544913251), (-31.979482603, 20.153435862), (-31.495567884, 19.05))
            ThreePointArc((-31.495567884, 19.05), (-32.667330149, 17.586353872), (-34.351914536, 18.409434812))
            Line((-34.351914536, 18.409434812), (-34.351914536, -19.833087105))
            Line((-34.351914536, -19.833087105), (-14.226813668, -31.452319508))
            ThreePointArc((-14.226813668, -31.452319508), (-12.259283229, -31.333163829), (-11.2395, -33.02))
            ThreePointArc((-11.2395, -33.02), (-11.241048638, -33.096797874), (-11.245692035, -33.173470886))
            Line((-11.245692035, -33.173470886), (0, -39.666174209))
            Line((0, -39.666174209), (11.245692035, -33.173470886))
            ThreePointArc((11.245692035, -33.173470886), (12.192, -31.370221606), (14.226813668, -31.452319508))
            Line((14.226813668, -31.452319508), (33.118995485, -20.544913251))
            ThreePointArc((33.118995485, -20.544913251), (31.696529779, -18.3), (34.351914536, -18.409434812))
            Line((34.351914536, -18.409434812), (34.351914536, 19.833087105))
            Line((34.351914536, 19.833087105), (23.880494201, 25.878764454))
            add(Edge.make_bspline(
                [(23.880494201, 25.878764454), (23.724786032, 25.69628198), (23.560757013, 25.520801391), (23.388812385, 25.35281665), (23.209393805, 25.192784203), (23.022979339, 25.041122982), (22.540264994, 24.683499874), (22.235799029, 24.488530911), (21.918441414, 24.314613049), (21.590074219, 24.162797085), (21.252685586, 24.033914158), (20.908385644, 23.92853792)],
                knots=[0.379057466, 0.379057466, 0.379057466, 0.379057466, 0.379057466, 0.379057466, 0.379057466, 0.50000093, 0.50000093, 0.50000093, 0.50000093, 0.50000093, 0.681713738, 0.681713738, 0.681713738, 0.681713738, 0.681713738, 0.681713738, 0.681713738], degree=6))
            Line((20.908385644, 23.92853792), (31.176914536, 18))
            Line((31.176914536, 18), (31.176914536, -18))
            Line((31.176914536, -18), (0, -36))
            Line((0, -36), (-31.176914536, -18))
            Line((-31.176914536, -18), (-31.176914536, 18))
            Line((-31.176914536, 18), (-20.908385644, 23.92853792))
        make_face()
        with BuildLine():
            add(Edge.make_bspline(
                [(-17.200482213, 23.925830908), (-17.459469608, 23.846978773), (-17.723083673, 23.781196488), (-17.990425461, 23.728880551), (-18.260572685, 23.690328284), (-18.532581005, 23.665740503), (-19.00632449, 23.64748488), (-19.20765189, 23.647366474), (-19.40908444, 23.654911047), (-19.610239409, 23.670133105), (-19.810734433, 23.693019578), (-20.155249132, 23.745719833), (-20.29976023, 23.77194264), (-20.443574195, 23.802182667), (-20.58654585, 23.83641693), (-20.728531441, 23.874615043), (-20.875894192, 23.918684735), (-20.882397342, 23.920638634), (-20.888898077, 23.922600907), (-20.895396381, 23.924571547), (-20.901892242, 23.926550553), (-20.908385644, 23.92853792)],
                knots=[0, 0, 0, 0, 0, 0, 0, 0.138632797, 0.138632797, 0.138632797, 0.138632797, 0.138632797, 0.240657178, 0.240657178, 0.240657178, 0.240657178, 0.240657178, 0.314859209, 0.314859209, 0.314859209, 0.314859209, 0.314859209, 0.318286262, 0.318286262, 0.318286262, 0.318286262, 0.318286262, 0.318286262, 0.318286262], degree=6))
            Line((-20.908385644, 23.92853792), (-31.176914536, 18))
            Line((-31.176914536, 18), (-31.176914536, -18))
            Line((-31.176914536, -18), (0, -36))
            Line((0, -36), (31.176914536, -18))
            Line((31.176914536, -18), (31.176914536, 18))
            Line((31.176914536, 18), (20.908385644, 23.92853792))
            add(Edge.make_bspline(
                [(20.908385644, 23.92853792), (20.901892242, 23.926550553), (20.895396381, 23.924571547), (20.888898077, 23.922600907), (20.882397342, 23.920638634), (20.875894192, 23.918684735), (20.728531441, 23.874615043), (20.58654585, 23.83641693), (20.443574195, 23.802182667), (20.29976023, 23.77194264), (20.155249132, 23.745719833), (19.810734433, 23.693019578), (19.610239409, 23.670133105), (19.40908444, 23.654911047), (19.20765189, 23.647366474), (19.00632449, 23.64748488), (18.532581005, 23.665740503), (18.260572685, 23.690328284), (17.990425461, 23.728880551), (17.723083673, 23.781196488), (17.459469608, 23.846978773), (17.200482213, 23.925830908)],
                knots=[0.681713738, 0.681713738, 0.681713738, 0.681713738, 0.681713738, 0.681713738, 0.681713738, 0.685140791, 0.685140791, 0.685140791, 0.685140791, 0.685140791, 0.759342822, 0.759342822, 0.759342822, 0.759342822, 0.759342822, 0.861367203, 0.861367203, 0.861367203, 0.861367203, 0.861367203, 1, 1, 1, 1, 1, 1, 1], degree=6))
            add(Edge.make_bspline(
                [(17.200482211, 23.925830899), (17.144714317, 23.942810174), (17.08892802, 23.959728991), (17.03312338, 23.97658725), (16.977300457, 23.993384851), (16.92145931, 24.010121695), (14.159965962, 24.834525535), (11.411116029, 25.499660319), (8.627008592, 26.010516368), (5.817329363, 26.357677075), (2.993713037, 26.535534726), (0.170010835, 26.544032169)],
                knots=[0.167149631, 0.167149631, 0.167149631, 0.167149631, 0.167149631, 0.167149631, 0.167149631, 0.173816956, 0.173816956, 0.173816956, 0.173816956, 0.173816956, 0.496759352, 0.496759352, 0.496759352, 0.496759352, 0.496759352, 0.496759352, 0.496759352], degree=6))
            Line((0.170010835, 26.544032169), (-2.385708701, 22.319852499))
            add(Edge.make_bspline(
                [(1.620176348, 5.69433156), (1.509326153, 5.687881832), (-1.385391089, 5.53059626), (-5.611900633, 5.801343952), (-7.868551057, 6.347108354), (-8.955239032, 6.817181438), (-9.386496565, 7.143658554), (-9.437257428, 7.221736919), (-9.473831725, 7.283189394), (-9.560278482, 7.765593639), (-9.482042175, 8.88761919), (-8.935485792, 11.068929454), (-7.229003309, 14.855816655), (-4.379692923, 19.560468803), (-2.385708701, 22.319852499)],
                knots=[0.090051127, 0.090051127, 0.090051127, 0.09375, 0.1875, 0.28125, 0.34375, 0.40625, 0.46875, 0.53125, 0.59375, 0.65625, 0.71875, 0.8125, 0.90625, 1, 1, 1], degree=2))
            ThreePointArc((1.620176348, 5.69433156), (11.475358731, 8.358328841), (17.337085464, 0))
            ThreePointArc((17.337085464, 0), (12.304081548, -8.009724166), (2.903861345, -6.950163046))
            add(Edge.make_bspline(
                [(2.903861345, -6.950163046), (2.496424378, -6.977033131), (-1.281397682, -7.18582742), (-7.225551643, -6.849649329), (-11.650718957, -5.820633983), (-14.952826408, -4.460745526), (-17.953705537, -2.387123362), (-20.378422572, 0.505035294), (-21.860667408, 3.983957581), (-22.33638102, 7.612065838), (-22.020118931, 11.17069053), (-20.877728865, 15.552865246), (-18.404993389, 20.924969938), (-16.555707216, 23.971622428), (-16.445662414, 24.150603211)],
                knots=[0.08261428, 0.08261428, 0.08261428, 0.09375, 0.1875, 0.28125, 0.34375, 0.40625, 0.46875, 0.53125, 0.59375, 0.65625, 0.71875, 0.8125, 0.90625, 0.912069887, 0.912069887, 0.912069887], degree=2))
            add(Edge.make_bspline(
                [(-16.445662414, 24.150603211), (-16.515723238, 24.130208348), (-16.585755757, 24.109717462), (-16.655759831, 24.089130753), (-16.725735322, 24.068448419), (-16.79568209, 24.047670662), (-16.92145931, 24.010121695), (-16.977300457, 23.993384851), (-17.03312338, 23.97658725), (-17.08892802, 23.959728991), (-17.144714317, 23.942810174), (-17.200482211, 23.925830899)],
                knots=[0.817837696, 0.817837696, 0.817837696, 0.817837696, 0.817837696, 0.817837696, 0.817837696, 0.826183044, 0.826183044, 0.826183044, 0.826183044, 0.826183044, 0.832850369, 0.832850369, 0.832850369, 0.832850369, 0.832850369, 0.832850369, 0.832850369], degree=6))
        make_face()
    extrude(amount=BOSS_EXTRUDE12_DEPTH)

    # Fillet8: read off the stored shape, not the designer's step
    # Fillet8 outline → Fillet8 (cut)
    with BuildSketch(Plane(origin=(0, 0, 0), x_dir=(1, 0, 0), z_dir=(0, 1, 0)).offset(FILLET8_START)):
        with BuildLine():
            add(Edge.make_bspline(
                [(-17.200482213, -23.925830908), (-16.823072312, -24.04073834), (-16.445662411, -24.150603216)],
                knots=[0.16140783, 0.16140783, 0.16140783, 0.176266488, 0.176266488, 0.176266488], degree=2))
            add(Edge.make_bspline(
                [(-19.814278915, -17.857491149), (-19.729210788, -18.048061118), (-18.404993389, -20.924969938), (-16.555707215, -23.971622431), (-16.445662411, -24.150603216)],
                knots=[0.805838628, 0.805838628, 0.805838628, 0.8125, 0.90625, 0.912069887, 0.912069887, 0.912069887], degree=2))
            ThreePointArc((-19.814278915, -17.857491149), (-19.646031314, -21.570938879), (-22.051716439, -24.40478439))
            ThreePointArc((-22.051716439, -24.40478439), (-19.67389065, -23.681237871), (-17.200482213, -23.925830908))
        make_face()
        with BuildLine():
            ThreePointArc((3.27583035, -26.449313478), (0.61618061, -25.873433503), (-1.364645069, -24.007500998))
            Line((-1.364645069, -24.007500998), (0.170010834, -26.544032168))
            add(Edge.make_bspline(
                [(0.170010834, -26.544032168), (1.722920592, -26.53935894), (3.27583035, -26.449313478)],
                knots=[0.50334667, 0.50334667, 0.50334667, 0.564484849, 0.564484849, 0.564484849], degree=2))
        make_face()
    extrude(amount=FILLET8_DEPTH, mode=Mode.SUBTRACT)

    # Fillet8 2 outline → Fillet8 2 (add)
    with BuildSketch(Plane(origin=(0, 0, 0), x_dir=(1, 0, 0), z_dir=(0, 1, 0)).offset(FILLET8_START_2)):
        with BuildLine():
            ThreePointArc((-2.502754207, -22.15754776), (-2.387809079, -22.324172025), (-2.279593451, -22.495243373))
            Line((-2.279593451, -22.495243373), (-2.385708701, -22.319852499))
            add(Edge.make_bspline(
                [(-2.502754207, -22.15754776), (-2.444478741, -22.238523325), (-2.385708701, -22.319852499)],
                knots=[0.997236843, 0.997236843, 0.997236843, 1, 1, 1], degree=2))
        make_face()
    extrude(amount=FILLET8_2_DEPTH)

    # Sketch18 → Boss-Extrude13 (add)
    with BuildSketch(Plane.XZ.offset(16.51)):
        with BuildLine():
            Line((20.908385644, 23.92853792), (31.176914536, 18))
            Line((31.176914536, 18), (31.176914536, -18))
            Line((31.176914536, -18), (0, -36))
            Line((0, -36), (-31.176914536, -18))
            Line((-31.176914536, -18), (-31.176914536, 18))
            Line((-31.176914536, 18), (-21.15091291, 23.788514738))
            ThreePointArc((-21.15091291, 23.788514738), (-21.584715967, 24.120911953), (-22.051716439, 24.40478439))
            ThreePointArc((-22.051716439, 24.40478439), (-23.034850715, 25.056481514), (-23.880494212, 25.878764448))
            Line((-23.880494212, 25.878764448), (-33.118995485, 20.544913251))
            ThreePointArc((-33.118995485, 20.544913251), (-31.696529779, 18.3), (-34.351914536, 18.409434812))
            Line((-34.351914536, 18.409434812), (-34.351914536, -19.833087105))
            Line((-34.351914536, -19.833087105), (-14.226813668, -31.452319508))
            ThreePointArc((-14.226813668, -31.452319508), (-12.192, -31.370221606), (-11.245692035, -33.173470886))
            Line((-11.245692035, -33.173470886), (0, -39.666174209))
            Line((0, -39.666174209), (11.245692035, -33.173470886))
            ThreePointArc((11.245692035, -33.173470886), (12.192, -31.370221606), (14.226813668, -31.452319508))
            Line((14.226813668, -31.452319508), (33.118995485, -20.544913251))
            ThreePointArc((33.118995485, -20.544913251), (31.696529779, -18.3), (34.351914536, -18.409434812))
            Line((34.351914536, -18.409434812), (34.351914536, 19.833087105))
            Line((34.351914536, 19.833087105), (23.880494212, 25.878764448))
            ThreePointArc((23.880494212, 25.878764448), (22.533694061, 24.691430503), (20.908385644, 23.92853792))
        make_face()
    extrude(amount=BOSS_EXTRUDE13_DEPTH)

    # Fillet9
    fillet9_edges = [part.edges().sort_by_distance(p)[0] for p in [
        (2.903861345, -8.255, -6.950163046),
        (1.620176348, -8.255, 5.69433156),
    ]]
    fillet(fillet9_edges, radius=FILLET9_R)

    # Sketch20 → Boss-Extrude14 (add)
    with BuildSketch(Plane.XZ.offset(18.01).offset(BOSS_EXTRUDE14_START)):
        with BuildLine():
            ThreePointArc((-30.879507358, 21.837882324), (-36.026656797, 20.8), (-34.351914536, 15.823496667))
            Line((-34.351914536, 15.823496667), (-34.351914536, 18.409434812))
            ThreePointArc((-34.351914536, 18.409434812), (-34.29460599, 19.8), (-33.118995485, 20.544913251))
            Line((-33.118995485, 20.544913251), (-30.879507358, 21.837882324))
        make_face()
        with BuildLine():
            Line((-14.226813668, -31.452319508), (-16.043331857, -30.403552243))
            ThreePointArc((-16.043331857, -30.403552243), (-15.097, -36.401829202), (-9.429173846, -34.222238151))
            Line((-9.429173846, -34.222238151), (-11.245692035, -33.173470886))
            ThreePointArc((-11.245692035, -33.173470886), (-14.097, -34.669778394), (-14.226813668, -31.452319508))
        make_face()
        with BuildLine():
            Line((11.245692035, -33.173470886), (9.429173846, -34.222238151))
            ThreePointArc((9.429173846, -34.222238151), (15.097, -36.401829202), (16.043331857, -30.403552243))
            Line((16.043331857, -30.403552243), (14.226813668, -31.452319508))
            ThreePointArc((14.226813668, -31.452319508), (14.097, -34.669778394), (11.245692035, -33.173470886))
        make_face()
        with BuildLine():
            Line((33.118995485, -20.544913251), (30.879507358, -21.837882324))
            ThreePointArc((30.879507358, -21.837882324), (36.026656797, -20.8), (34.351914536, -15.823496667))
            Line((34.351914536, -15.823496667), (34.351914536, -18.409434812))
            ThreePointArc((34.351914536, -18.409434812), (34.29460599, -19.8), (33.118995485, -20.544913251))
        make_face()
    extrude(amount=BOSS_EXTRUDE14_DEPTH)

    # Sketch21 → Boss-Extrude15 (add)
    with BuildSketch(Plane.XZ.offset(18.01)):
        with BuildLine():
            ThreePointArc((-19.503828958, 21.073284891), (-20.417909733, 23.014253156), (-22.051716439, 24.40478439))
            ThreePointArc((-22.051716439, 24.40478439), (-23.034850715, 25.056481514), (-23.880494212, 25.878764448))
            Line((-23.880494212, 25.878764448), (-30.879507358, 21.837882324))
            ThreePointArc((-30.879507358, 21.837882324), (-36.026656797, 20.8), (-34.351914536, 15.823496667))
            Line((-34.351914536, 15.823496667), (-34.351914536, -19.833087105))
            Line((-34.351914536, -19.833087105), (-16.043331857, -30.403552243))
            ThreePointArc((-16.043331857, -30.403552243), (-15.097, -36.401829202), (-9.429173846, -34.222238151))
            Line((-9.429173846, -34.222238151), (0, -39.666174209))
            Line((0, -39.666174209), (9.429173846, -34.222238151))
            ThreePointArc((9.429173846, -34.222238151), (15.097, -36.401829202), (16.043331857, -30.403552243))
            Line((16.043331857, -30.403552243), (30.879507358, -21.837882324))
            ThreePointArc((30.879507358, -21.837882324), (36.026656797, -20.8), (34.351914536, -15.823496667))
            Line((34.351914536, -15.823496667), (34.351914536, 19.833087105))
            Line((34.351914536, 19.833087105), (23.880494212, 25.878764448))
            ThreePointArc((23.880494212, 25.878764448), (22.533694061, 24.691430503), (20.908385644, 23.92853792))
            Line((20.908385644, 23.92853792), (19.320885644, 21.178907263))
            Line((19.320885644, 21.178907263), (28.001914536, 16.166912895))
            Line((28.001914536, 16.166912895), (28.001914536, -16.166912895))
            Line((28.001914536, -16.166912895), (0, -32.333825791))
            Line((0, -32.333825791), (-28.001914536, -16.166912895))
            Line((-28.001914536, -16.166912895), (-28.001914536, 16.166912895))
            Line((-28.001914536, 16.166912895), (-19.503828958, 21.073284891))
        make_face()
        with Locations(Location((32.995567884, -19.05, 0), (0, 0, 90))):
            Circle(SKETCH21_R, mode=Mode.SUBTRACT)
        with Locations(Location((-32.995567884, 19.05, 0), (0, 0, 90))):
            Circle(SKETCH21_R, mode=Mode.SUBTRACT)
        with Locations(Location((-13.1445, -33.02, 0), (0, 0, 270))):
            Circle(SKETCH21_R_2, mode=Mode.SUBTRACT)
        with Locations(Location((13.1445, -33.02, 0), (0, 0, 270))):
            Circle(SKETCH21_R_2, mode=Mode.SUBTRACT)
    extrude(amount=BOSS_EXTRUDE15_DEPTH)

    # Sketch22 → Cut-Extrude6 (cut)
    with BuildSketch(Plane(origin=(0, 20.955, 0), x_dir=(1, 0, 0), z_dir=(0, 1, 0))):
        Circle(SKETCH22_R)
    extrude(amount=-CUT_EXTRUDE6_DEPTH, mode=Mode.SUBTRACT)


with BuildPart() as body_2:
    # of the pieces the cut leaves, the one that is kept (cut_extrude6_keep)
    add(part.part.solids().sort_by_distance((-22.051716439, -18.01, 24.40478439))[0])

    # Sketch24 → Cut-Extrude7 (cut)
    with BuildSketch(Plane.XZ.offset(21.185)):
        with Locations(Location((-32.995567884, 19.05, 0), (0, 0, 270))):
            Circle(SKETCH24_R)
        with Locations(Location((-13.1445, -33.02, 0), (0, 0, 270))):
            Circle(SKETCH24_R)
        with Locations(Location((13.1445, -33.02, 0), (0, 0, 270))):
            Circle(SKETCH24_R)
        with Locations(Location((32.995567884, -19.05, 0), (0, 0, 270))):
            Circle(SKETCH24_R)
    extrude(amount=-CUT_EXTRUDE7_DEPTH, mode=Mode.SUBTRACT)

    # Sketch25 → Boss-Extrude16 (add)
    with BuildSketch(Plane.XZ.offset(21.185)):
        with BuildLine():
            Line((-30.879507358, 21.837882324), (-29.434042775, 22.67242169))
            ThreePointArc((-29.434042775, 22.67242169), (-37.394976935, 21.59), (-34.351914536, 14.154417935))
            Line((-34.351914536, 14.154417935), (-34.351914536, 15.823496667))
            ThreePointArc((-34.351914536, 15.823496667), (-36.026656797, 20.8), (-30.879507358, 21.837882324))
        make_face()
        with BuildLine():
            Line((-16.043331857, -30.403552243), (-17.078464592, -29.80591808))
            ThreePointArc((-17.078464592, -29.80591808), (-15.6845, -37.419409051), (-8.394041111, -34.819872314))
            Line((-8.394041111, -34.819872314), (-9.429173846, -34.222238151))
            ThreePointArc((-9.429173846, -34.222238151), (-15.097, -36.401829202), (-16.043331857, -30.403552243))
        make_face()
        with BuildLine():
            Line((9.429173846, -34.222238151), (8.394041111, -34.819872314))
            ThreePointArc((8.394041111, -34.819872314), (14.059395854, -38.016935619), (18.2245, -33.02))
            ThreePointArc((18.2245, -33.02), (17.929421114, -31.313855242), (17.078464592, -29.80591808))
            Line((17.078464592, -29.80591808), (16.043331857, -30.403552243))
            ThreePointArc((16.043331857, -30.403552243), (15.097, -36.401829202), (9.429173846, -34.222238151))
        make_face()
        with BuildLine():
            Line((30.879507358, -21.837882324), (29.434042775, -22.67242169))
            ThreePointArc((29.434042775, -22.67242169), (34.959473743, -23.73502655), (38.075567884, -19.05))
            ThreePointArc((38.075567884, -19.05), (37.038873524, -15.97460092), (34.351914536, -14.154417935))
            Line((34.351914536, -14.154417935), (34.351914536, -15.823496667))
            ThreePointArc((34.351914536, -15.823496667), (36.026656797, -20.8), (30.879507358, -21.837882324))
        make_face()
    extrude(amount=-BOSS_EXTRUDE16_DEPTH)

    # Fillet10
    fillet10_edges = [body_2.edges().sort_by_distance(p)[0] for p in [
        (-17.078464592, -19.5975, -29.80591808),
        (-8.394041111, -19.5975, -34.819872314),
        (8.394041111, -19.5975, -34.819872314),
        (17.078464592, -19.5975, -29.80591808),
        (29.434042775, -19.5975, -22.67242169),
        (34.351914536, -19.5975, -14.154417935),
        (-29.434042775, -19.5975, 22.67242169),
        (-34.351914536, -19.5975, 14.154417935),
    ]]
    fillet(fillet10_edges, radius=FILLET10_R)


solid = body_2.part
